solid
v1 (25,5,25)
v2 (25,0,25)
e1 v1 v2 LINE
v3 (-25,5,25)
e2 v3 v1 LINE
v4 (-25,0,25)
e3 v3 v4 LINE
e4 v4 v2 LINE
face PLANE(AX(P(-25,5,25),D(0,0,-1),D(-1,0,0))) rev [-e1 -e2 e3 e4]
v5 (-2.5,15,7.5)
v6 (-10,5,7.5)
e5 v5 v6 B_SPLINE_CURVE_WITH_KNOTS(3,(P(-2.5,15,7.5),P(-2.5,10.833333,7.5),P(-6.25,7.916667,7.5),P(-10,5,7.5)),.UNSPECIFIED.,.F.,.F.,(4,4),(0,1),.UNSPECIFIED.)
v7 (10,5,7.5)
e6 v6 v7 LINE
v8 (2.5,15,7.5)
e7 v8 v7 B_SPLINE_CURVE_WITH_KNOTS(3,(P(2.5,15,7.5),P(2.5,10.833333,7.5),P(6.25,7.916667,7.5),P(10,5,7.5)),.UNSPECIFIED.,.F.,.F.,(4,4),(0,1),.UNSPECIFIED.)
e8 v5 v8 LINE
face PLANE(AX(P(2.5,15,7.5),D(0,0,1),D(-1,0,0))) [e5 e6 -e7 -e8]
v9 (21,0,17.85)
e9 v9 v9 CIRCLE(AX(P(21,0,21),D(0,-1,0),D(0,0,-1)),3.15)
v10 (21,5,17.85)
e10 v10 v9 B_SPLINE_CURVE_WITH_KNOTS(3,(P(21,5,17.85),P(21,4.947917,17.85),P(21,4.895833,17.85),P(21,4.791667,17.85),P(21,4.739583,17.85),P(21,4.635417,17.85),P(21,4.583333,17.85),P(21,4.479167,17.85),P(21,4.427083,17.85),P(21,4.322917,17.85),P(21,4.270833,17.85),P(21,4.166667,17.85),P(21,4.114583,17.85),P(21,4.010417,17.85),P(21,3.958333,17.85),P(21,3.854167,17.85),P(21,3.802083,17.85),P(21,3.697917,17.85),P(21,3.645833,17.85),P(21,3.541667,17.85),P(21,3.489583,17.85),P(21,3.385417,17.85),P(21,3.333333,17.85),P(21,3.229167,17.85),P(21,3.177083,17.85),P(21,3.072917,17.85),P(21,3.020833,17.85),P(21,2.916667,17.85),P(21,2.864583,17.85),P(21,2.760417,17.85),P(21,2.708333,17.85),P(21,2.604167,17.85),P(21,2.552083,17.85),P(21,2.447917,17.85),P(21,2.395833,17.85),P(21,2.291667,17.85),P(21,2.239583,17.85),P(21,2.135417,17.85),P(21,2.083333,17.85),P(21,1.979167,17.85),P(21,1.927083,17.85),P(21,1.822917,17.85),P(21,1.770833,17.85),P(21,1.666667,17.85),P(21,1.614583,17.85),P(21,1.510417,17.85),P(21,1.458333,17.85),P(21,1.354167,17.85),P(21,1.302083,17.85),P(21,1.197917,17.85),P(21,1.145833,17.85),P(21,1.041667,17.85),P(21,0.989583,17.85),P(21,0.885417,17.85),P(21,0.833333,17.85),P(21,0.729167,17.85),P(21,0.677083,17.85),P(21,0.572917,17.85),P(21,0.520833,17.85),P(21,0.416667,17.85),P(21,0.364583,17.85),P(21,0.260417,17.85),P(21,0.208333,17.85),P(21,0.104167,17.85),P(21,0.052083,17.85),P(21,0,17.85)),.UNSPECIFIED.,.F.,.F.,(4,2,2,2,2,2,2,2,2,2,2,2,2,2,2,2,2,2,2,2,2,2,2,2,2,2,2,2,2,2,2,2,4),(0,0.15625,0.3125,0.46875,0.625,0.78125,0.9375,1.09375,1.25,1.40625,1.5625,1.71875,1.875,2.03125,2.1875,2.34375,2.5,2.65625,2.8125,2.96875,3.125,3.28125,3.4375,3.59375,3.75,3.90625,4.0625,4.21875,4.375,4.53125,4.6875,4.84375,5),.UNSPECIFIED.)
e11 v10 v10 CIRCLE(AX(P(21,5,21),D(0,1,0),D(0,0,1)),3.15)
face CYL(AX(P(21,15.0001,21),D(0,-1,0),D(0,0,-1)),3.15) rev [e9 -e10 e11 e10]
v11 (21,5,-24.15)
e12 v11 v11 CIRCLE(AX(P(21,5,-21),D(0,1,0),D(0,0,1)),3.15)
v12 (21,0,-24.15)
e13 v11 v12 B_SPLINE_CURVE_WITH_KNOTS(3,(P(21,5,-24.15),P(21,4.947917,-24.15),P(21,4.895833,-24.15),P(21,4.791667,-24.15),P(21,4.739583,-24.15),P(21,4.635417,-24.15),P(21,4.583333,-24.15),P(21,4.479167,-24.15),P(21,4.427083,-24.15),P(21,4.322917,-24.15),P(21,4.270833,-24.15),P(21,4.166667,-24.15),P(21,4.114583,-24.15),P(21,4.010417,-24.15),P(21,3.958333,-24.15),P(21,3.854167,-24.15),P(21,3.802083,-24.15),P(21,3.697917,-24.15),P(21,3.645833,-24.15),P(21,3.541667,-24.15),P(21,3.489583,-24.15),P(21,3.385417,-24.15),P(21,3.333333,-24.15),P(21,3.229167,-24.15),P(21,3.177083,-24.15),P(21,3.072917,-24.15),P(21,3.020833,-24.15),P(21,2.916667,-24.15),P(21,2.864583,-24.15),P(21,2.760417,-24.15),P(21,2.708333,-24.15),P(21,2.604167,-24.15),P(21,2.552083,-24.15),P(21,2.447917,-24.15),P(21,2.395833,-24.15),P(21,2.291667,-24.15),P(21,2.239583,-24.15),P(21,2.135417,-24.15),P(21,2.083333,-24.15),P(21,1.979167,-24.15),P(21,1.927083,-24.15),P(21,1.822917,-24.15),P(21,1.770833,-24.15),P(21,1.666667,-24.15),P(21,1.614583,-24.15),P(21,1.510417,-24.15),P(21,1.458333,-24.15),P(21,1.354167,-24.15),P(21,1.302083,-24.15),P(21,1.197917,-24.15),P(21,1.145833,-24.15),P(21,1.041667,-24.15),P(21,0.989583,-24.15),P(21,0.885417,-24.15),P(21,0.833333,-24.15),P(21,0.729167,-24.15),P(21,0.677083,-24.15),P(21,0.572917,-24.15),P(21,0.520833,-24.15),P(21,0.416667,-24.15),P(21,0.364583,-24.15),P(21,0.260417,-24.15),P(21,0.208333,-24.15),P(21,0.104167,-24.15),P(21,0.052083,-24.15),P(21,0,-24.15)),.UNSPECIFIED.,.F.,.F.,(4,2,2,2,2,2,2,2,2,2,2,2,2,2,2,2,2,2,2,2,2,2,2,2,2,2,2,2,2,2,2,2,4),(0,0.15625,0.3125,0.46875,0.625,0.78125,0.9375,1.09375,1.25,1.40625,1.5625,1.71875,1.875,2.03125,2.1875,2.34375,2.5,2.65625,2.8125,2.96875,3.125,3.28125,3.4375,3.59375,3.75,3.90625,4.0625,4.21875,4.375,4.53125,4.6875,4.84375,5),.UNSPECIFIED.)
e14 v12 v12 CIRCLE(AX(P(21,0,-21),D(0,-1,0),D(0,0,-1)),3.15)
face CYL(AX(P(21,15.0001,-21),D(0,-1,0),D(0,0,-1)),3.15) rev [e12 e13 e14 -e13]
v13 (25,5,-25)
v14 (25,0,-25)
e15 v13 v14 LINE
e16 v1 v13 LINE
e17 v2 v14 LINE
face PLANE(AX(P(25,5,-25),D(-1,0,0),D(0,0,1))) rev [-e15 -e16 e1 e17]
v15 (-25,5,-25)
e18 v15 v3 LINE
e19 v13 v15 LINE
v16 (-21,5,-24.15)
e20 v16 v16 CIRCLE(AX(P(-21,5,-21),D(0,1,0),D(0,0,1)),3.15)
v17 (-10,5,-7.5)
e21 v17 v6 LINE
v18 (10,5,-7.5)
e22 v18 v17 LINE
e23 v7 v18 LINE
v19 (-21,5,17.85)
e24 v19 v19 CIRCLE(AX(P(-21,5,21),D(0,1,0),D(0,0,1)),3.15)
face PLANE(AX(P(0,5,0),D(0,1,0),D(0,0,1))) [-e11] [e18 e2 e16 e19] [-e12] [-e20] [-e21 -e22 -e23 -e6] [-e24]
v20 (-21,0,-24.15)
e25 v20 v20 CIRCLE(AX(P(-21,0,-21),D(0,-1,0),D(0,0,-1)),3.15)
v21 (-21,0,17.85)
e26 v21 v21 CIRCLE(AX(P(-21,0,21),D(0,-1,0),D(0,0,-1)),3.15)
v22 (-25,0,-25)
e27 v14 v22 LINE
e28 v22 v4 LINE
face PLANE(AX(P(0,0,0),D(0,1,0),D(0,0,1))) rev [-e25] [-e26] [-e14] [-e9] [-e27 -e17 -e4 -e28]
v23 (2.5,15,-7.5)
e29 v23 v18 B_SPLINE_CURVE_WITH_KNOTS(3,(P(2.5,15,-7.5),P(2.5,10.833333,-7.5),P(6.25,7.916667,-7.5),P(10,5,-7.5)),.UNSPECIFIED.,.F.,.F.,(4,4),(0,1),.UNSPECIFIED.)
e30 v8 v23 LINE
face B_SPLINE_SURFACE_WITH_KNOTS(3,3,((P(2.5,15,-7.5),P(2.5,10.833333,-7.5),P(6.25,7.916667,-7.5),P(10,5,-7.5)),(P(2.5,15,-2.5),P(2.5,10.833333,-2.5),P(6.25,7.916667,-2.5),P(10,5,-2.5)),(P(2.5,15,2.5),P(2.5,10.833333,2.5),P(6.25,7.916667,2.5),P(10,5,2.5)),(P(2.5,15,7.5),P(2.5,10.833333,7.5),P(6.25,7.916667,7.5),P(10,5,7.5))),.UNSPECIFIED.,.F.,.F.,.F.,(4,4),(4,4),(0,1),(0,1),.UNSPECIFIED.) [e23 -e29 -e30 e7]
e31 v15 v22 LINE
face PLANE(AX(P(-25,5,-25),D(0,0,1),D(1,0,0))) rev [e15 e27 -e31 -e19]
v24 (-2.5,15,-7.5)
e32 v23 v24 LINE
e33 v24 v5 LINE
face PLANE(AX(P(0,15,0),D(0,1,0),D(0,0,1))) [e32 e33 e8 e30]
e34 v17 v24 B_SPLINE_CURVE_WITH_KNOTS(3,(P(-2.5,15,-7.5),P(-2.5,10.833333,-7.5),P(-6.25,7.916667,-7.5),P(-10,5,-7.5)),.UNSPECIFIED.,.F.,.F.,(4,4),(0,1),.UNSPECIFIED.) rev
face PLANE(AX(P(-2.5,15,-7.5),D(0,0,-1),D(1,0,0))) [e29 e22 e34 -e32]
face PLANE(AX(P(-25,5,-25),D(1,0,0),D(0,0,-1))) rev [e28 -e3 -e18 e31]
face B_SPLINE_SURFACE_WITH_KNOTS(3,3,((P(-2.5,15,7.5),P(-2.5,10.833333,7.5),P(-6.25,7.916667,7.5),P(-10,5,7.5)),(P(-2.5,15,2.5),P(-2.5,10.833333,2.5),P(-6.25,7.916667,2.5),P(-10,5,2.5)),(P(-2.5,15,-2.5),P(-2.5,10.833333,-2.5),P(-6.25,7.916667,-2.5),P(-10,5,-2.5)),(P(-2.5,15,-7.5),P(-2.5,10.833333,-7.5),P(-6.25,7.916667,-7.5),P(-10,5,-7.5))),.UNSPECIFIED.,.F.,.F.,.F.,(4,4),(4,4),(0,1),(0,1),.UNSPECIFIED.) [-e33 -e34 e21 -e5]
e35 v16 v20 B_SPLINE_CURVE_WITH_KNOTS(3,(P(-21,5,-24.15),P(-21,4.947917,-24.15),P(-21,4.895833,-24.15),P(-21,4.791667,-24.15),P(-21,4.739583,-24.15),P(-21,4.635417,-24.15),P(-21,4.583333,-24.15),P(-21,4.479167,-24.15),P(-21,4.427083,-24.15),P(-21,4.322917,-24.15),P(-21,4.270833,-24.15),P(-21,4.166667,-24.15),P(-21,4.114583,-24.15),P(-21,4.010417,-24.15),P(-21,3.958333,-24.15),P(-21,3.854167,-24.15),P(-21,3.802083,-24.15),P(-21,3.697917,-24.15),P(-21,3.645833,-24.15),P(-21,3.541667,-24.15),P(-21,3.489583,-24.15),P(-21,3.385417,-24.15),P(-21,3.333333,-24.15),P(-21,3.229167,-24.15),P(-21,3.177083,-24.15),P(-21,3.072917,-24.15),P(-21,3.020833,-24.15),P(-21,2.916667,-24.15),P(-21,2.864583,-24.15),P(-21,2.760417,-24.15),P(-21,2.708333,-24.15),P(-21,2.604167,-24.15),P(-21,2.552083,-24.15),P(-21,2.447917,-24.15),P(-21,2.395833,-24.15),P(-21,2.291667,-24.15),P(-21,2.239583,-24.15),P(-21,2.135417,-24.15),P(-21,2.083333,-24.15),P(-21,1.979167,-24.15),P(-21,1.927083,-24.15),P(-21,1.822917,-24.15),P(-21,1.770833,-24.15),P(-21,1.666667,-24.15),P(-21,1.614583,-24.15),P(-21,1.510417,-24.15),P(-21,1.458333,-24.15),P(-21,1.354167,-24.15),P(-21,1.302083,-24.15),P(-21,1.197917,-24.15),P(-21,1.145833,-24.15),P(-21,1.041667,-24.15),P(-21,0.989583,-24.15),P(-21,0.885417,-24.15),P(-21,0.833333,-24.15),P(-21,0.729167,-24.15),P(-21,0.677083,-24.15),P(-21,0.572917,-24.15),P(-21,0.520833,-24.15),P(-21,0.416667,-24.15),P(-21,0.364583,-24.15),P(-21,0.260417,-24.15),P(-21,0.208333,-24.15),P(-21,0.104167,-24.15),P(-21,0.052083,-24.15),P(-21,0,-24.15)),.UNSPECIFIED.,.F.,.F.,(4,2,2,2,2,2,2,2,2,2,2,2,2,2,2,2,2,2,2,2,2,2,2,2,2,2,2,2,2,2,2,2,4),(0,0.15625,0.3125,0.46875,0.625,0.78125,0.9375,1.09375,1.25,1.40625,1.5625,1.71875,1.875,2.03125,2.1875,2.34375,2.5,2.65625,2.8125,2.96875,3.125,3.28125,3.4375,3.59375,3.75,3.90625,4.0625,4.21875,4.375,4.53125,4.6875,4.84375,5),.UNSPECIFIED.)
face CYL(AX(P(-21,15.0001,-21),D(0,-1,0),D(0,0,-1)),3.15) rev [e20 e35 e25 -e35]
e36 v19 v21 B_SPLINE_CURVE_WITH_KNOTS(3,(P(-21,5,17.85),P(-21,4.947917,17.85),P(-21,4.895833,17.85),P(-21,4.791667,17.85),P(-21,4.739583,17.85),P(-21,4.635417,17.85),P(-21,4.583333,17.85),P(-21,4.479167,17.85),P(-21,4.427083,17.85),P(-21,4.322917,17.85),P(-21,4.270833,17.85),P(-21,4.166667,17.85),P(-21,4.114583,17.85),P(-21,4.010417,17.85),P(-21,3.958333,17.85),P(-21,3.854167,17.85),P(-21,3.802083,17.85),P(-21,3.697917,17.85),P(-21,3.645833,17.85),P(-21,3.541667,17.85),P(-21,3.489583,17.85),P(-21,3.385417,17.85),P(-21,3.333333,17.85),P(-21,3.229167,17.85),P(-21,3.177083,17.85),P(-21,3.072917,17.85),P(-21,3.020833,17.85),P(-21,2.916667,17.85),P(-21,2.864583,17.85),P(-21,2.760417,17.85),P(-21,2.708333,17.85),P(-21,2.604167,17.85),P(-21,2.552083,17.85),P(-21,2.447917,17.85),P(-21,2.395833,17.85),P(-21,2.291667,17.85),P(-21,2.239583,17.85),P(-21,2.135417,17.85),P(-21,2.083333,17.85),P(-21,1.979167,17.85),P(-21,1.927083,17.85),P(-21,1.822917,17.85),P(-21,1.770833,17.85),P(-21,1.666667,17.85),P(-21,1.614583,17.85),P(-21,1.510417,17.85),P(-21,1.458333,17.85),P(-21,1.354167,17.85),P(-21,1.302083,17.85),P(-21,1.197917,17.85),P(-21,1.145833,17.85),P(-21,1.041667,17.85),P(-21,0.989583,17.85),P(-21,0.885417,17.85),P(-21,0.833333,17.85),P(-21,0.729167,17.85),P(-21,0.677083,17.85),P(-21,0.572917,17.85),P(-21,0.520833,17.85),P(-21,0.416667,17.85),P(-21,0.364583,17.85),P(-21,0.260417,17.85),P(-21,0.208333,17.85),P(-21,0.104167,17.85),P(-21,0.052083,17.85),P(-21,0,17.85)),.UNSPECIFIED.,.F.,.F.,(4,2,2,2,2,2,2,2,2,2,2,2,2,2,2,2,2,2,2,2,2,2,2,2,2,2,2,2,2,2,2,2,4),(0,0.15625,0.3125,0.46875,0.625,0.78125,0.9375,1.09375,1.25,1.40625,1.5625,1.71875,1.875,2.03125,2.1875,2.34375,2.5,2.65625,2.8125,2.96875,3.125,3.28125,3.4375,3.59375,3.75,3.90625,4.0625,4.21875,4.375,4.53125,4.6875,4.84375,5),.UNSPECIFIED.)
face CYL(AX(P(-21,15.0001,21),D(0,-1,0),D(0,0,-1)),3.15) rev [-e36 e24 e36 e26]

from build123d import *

# Parameters (mm, degrees)
SKETCH1_W           = 50
SKETCH1_H           = 50
BOSS_EXTRUDE1_DEPTH = 5
LOFT1_START         = -7.5
LOFT1_DEPTH         = 15
SKETCH7_R           = 3.15
CUT_EXTRUDE1_DEPTH  = 39.405728778


# Read off the part's stored shape, not the designer's step: Loft1
with BuildPart() as part:
    # Sketch1 → Boss-Extrude1 (new body)
    with BuildSketch(Plane(origin=(0, 0, 0), x_dir=(1, 0, 0), z_dir=(0, 1, 0))):
        Rectangle(SKETCH1_W, SKETCH1_H)
    extrude(amount=BOSS_EXTRUDE1_DEPTH)

    # Loft1 outline → Loft1 (add)
    with BuildSketch(Plane.XY.offset(LOFT1_START)):
        with BuildLine():
            add(Edge.make_bspline(
                [(2.5, 15), (2.5, 10.833333333), (6.25, 7.916666667), (10, 5)],
                knots=[0, 0, 0, 0, 1, 1, 1, 1], degree=3))
            Line((2.5, 15), (-2.5, 15))
            add(Edge.make_bspline(
                [(-2.5, 15), (-2.5, 10.833333333), (-6.25, 7.916666667), (-10, 5)],
                knots=[0, 0, 0, 0, 1, 1, 1, 1], degree=3))
            Line((-10, 5), (10, 5))
        make_face()
    extrude(amount=LOFT1_DEPTH)

    # Sketch7 → Cut-Extrude1 (cut, through all)
    with BuildSketch(Plane(origin=(0, 0, 0), x_dir=(-1, 0, 0), z_dir=(0, -1, 0))):
        with Locations(Location((21, -21, 0), (0, 0, 90))):
            Circle(SKETCH7_R)
        with Locations(Location((-21, -21, 0), (0, 0, 90))):
            Circle(SKETCH7_R)
        with Locations(Location((-21, 21, 0), (0, 0, 90))):
            Circle(SKETCH7_R)
        with Locations(Location((21, 21, 0), (0, 0, 90))):
            Circle(SKETCH7_R)
    extrude(amount=-CUT_EXTRUDE1_DEPTH, mode=Mode.SUBTRACT)


solid = part.part
